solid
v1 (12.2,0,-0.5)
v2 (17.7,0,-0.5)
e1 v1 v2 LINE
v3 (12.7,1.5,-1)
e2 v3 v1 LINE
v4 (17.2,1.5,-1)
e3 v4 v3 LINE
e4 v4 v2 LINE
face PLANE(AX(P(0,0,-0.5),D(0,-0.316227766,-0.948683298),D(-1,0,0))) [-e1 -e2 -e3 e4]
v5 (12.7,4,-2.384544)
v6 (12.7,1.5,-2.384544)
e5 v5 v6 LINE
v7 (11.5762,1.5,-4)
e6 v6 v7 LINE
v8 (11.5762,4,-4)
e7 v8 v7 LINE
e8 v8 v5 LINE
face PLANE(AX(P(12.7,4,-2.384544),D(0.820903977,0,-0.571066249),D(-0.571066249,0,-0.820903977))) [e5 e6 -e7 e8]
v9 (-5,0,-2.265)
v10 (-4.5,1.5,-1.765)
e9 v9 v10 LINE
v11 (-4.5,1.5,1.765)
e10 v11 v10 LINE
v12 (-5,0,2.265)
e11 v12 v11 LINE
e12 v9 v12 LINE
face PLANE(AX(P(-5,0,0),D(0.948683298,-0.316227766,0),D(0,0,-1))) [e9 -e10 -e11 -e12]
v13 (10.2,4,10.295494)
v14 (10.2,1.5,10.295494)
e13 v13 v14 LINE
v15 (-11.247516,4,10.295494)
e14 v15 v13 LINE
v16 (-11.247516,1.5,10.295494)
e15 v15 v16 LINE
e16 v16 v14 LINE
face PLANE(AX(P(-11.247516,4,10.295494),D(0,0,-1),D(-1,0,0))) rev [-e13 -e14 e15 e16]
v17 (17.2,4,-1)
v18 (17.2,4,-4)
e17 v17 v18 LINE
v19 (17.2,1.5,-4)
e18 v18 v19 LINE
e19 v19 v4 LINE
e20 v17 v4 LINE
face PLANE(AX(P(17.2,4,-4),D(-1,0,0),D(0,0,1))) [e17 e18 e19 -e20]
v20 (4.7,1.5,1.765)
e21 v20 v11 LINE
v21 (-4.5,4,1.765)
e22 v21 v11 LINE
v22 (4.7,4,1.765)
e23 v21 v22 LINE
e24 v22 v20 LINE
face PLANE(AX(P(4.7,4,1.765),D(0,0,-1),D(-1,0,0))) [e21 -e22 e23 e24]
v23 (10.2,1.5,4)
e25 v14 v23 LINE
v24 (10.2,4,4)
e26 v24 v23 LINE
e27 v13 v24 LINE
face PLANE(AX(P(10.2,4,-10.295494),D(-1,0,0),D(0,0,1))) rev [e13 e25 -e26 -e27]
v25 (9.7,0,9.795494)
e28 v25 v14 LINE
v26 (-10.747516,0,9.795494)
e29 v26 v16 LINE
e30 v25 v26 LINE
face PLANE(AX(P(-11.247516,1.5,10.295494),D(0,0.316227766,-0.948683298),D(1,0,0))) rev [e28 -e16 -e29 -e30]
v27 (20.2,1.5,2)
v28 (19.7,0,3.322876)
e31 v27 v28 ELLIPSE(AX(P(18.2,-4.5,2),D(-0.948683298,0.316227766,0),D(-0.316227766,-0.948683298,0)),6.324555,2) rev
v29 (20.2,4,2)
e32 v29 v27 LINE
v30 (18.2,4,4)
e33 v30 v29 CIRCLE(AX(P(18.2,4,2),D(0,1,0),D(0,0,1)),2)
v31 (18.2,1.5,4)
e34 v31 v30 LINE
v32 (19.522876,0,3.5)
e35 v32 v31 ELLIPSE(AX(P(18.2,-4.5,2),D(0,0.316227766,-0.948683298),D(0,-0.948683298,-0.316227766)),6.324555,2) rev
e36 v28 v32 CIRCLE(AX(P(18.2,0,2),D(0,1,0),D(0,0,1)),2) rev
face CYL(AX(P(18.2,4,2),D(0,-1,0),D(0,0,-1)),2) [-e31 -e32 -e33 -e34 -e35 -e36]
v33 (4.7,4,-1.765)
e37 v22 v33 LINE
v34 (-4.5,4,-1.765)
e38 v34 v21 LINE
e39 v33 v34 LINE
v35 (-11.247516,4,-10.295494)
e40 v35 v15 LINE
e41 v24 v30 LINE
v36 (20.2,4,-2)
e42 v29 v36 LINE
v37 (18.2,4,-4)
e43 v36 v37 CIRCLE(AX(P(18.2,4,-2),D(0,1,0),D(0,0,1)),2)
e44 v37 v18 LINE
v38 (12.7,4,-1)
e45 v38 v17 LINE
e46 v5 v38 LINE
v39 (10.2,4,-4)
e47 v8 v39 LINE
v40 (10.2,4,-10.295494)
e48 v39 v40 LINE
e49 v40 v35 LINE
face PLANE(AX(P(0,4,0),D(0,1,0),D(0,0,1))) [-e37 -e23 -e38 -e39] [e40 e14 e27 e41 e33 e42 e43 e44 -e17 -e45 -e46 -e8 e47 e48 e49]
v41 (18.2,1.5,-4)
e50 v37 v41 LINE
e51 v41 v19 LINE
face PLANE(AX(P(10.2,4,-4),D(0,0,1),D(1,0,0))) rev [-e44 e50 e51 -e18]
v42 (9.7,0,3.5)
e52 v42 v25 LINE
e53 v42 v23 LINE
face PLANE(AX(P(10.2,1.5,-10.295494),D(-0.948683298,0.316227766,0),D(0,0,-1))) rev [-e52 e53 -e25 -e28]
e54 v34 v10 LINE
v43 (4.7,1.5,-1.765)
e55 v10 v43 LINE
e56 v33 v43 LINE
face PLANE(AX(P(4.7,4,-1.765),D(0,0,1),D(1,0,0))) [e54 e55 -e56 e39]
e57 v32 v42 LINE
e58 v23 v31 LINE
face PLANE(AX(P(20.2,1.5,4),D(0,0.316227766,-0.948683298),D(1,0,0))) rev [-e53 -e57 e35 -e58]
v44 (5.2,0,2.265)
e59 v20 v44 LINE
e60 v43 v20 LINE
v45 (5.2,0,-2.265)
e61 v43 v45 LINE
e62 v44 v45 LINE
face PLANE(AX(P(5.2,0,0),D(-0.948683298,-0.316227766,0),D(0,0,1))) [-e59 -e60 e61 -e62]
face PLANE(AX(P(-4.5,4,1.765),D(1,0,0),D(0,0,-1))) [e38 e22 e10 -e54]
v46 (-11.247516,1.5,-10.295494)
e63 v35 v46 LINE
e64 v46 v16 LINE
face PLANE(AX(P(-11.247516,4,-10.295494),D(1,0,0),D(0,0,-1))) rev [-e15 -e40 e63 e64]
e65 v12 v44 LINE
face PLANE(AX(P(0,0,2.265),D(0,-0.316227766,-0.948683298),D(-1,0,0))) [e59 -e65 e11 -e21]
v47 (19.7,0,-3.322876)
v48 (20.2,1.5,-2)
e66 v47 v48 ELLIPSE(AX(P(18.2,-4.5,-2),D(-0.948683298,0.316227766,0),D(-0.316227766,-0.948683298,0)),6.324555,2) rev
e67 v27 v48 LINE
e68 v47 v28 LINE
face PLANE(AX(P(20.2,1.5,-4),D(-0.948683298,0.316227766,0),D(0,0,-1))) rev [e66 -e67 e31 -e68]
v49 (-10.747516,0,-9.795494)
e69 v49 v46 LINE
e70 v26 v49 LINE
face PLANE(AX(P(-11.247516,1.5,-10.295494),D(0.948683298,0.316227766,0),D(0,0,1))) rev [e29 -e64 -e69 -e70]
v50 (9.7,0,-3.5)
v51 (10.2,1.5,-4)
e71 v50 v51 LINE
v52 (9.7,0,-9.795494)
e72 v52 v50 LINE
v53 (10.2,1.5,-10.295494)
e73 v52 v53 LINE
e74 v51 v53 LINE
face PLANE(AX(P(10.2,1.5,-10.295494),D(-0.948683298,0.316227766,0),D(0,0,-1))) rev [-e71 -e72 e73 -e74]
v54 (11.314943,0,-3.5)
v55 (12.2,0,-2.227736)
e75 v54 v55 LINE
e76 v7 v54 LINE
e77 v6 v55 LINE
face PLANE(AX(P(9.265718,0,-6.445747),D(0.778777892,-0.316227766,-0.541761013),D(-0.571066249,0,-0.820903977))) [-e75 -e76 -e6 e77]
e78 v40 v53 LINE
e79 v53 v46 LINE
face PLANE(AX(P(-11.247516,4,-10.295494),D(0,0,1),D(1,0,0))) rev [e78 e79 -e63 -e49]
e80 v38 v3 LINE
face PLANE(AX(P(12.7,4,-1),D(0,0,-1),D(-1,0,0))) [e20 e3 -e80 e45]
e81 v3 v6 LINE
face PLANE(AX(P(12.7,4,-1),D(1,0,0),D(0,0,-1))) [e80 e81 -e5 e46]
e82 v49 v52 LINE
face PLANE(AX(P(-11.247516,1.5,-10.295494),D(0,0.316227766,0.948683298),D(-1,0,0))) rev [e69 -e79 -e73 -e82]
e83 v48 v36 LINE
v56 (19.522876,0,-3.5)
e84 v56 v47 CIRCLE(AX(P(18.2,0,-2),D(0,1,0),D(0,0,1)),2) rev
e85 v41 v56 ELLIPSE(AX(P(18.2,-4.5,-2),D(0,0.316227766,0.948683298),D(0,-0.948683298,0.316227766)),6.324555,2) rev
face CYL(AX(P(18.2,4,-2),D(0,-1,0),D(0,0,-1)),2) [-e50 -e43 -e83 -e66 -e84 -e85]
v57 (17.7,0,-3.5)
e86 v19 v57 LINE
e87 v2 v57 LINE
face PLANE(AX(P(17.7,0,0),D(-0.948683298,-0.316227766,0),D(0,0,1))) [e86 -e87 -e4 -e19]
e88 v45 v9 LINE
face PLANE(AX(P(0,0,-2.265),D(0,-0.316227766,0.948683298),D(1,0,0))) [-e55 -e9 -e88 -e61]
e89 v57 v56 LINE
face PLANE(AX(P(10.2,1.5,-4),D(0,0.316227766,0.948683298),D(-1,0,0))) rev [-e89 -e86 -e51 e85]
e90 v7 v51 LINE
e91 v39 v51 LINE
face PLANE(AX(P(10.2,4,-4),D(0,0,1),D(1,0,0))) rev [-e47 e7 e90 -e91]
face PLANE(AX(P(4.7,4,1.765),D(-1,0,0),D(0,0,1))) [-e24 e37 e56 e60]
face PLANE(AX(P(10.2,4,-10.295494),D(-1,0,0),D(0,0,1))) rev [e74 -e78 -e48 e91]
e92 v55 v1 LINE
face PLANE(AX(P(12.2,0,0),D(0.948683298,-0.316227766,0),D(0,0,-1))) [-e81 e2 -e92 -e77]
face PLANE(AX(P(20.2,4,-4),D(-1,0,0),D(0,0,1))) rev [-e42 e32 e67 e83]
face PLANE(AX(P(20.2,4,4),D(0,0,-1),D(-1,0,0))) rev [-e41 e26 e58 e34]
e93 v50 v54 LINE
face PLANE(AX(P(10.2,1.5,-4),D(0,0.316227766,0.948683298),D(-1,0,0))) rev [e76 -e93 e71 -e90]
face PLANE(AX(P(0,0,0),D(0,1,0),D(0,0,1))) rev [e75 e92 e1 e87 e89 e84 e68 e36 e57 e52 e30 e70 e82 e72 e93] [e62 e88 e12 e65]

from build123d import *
from OCP.BRepFilletAPI import BRepFilletAPI_MakeChamfer

# Parameters (mm, degrees)
SKETCH1_W           = 21.447515714
SKETCH1_H           = 20.590988136
SKETCH1_W_2         = 9.2
SKETCH1_H_2         = 3.53
BOSS_EXTRUDE1_DEPTH = 4
SKETCH2_W           = 10
SKETCH2_H           = 8
BOSS_EXTRUDE3_DEPTH = 4
CUT_EXTRUDE1_DEPTH  = 24.022536743
CHAMFER1_SIZE       = 1.5
CHAMFER1_SIZE2      = 0.5
FILLET1_R           = 2


with BuildPart() as part:
    # Sketch1 → Boss-Extrude1 (new body)
    with BuildSketch(Plane(origin=(0, 0, 0), x_dir=(1, 0, 0), z_dir=(0, 1, 0))):
        with Locations((-0.523757857, 0)):
            Rectangle(SKETCH1_W, SKETCH1_H)
        with Locations((0.1, 0)):
            Rectangle(SKETCH1_W_2, SKETCH1_H_2, mode=Mode.SUBTRACT)
    extrude(amount=BOSS_EXTRUDE1_DEPTH)

    # Sketch2 → Boss-Extrude3 (add)
    with BuildSketch(Plane(origin=(0, 0, 0), x_dir=(1, 0, 0), z_dir=(0, 1, 0))):
        with Locations((15.2, 0)):
            Rectangle(SKETCH2_W, SKETCH2_H)
    extrude(amount=BOSS_EXTRUDE3_DEPTH)

    # Sketch3 → Cut-Extrude1 (cut, through all)
    with BuildSketch(Plane(origin=(0, 0, 0), x_dir=(1, 0, 0), z_dir=(0, 1, 0))):
        Polygon((12.7, 1), (12.7, 2.38454447), (11.576199706, 4), (12.7, 4), (17.2, 4), (17.2, 1), align=None)
    extrude(amount=CUT_EXTRUDE1_DEPTH, mode=Mode.SUBTRACT)

    # Chamfer1: one chamfer whose edges measure the first distance from different faces: ONE call of the kernel's chamfer builder (chamfer() names one face for all edges)
    chamfer1_edges_1 = [part.edges().sort_by_distance(p)[0] for p in [
        (4.7, 0, 0),
    ]]
    chamfer1_side_1 = [part.faces().sort_by_distance(p)[0] for p in [
        (4.7, 2, 0),
    ]]
    chamfer1_edges_2 = [part.edges().sort_by_distance(p)[0] for p in [
        (0.1, 0, -1.765),
    ]]
    chamfer1_side_2 = [part.faces().sort_by_distance(p)[0] for p in [
        (0.1, 2, -1.765),
    ]]
    chamfer1_edges_3 = [part.edges().sort_by_distance(p)[0] for p in [
        (-4.5, 0, 0),
    ]]
    chamfer1_side_3 = [part.faces().sort_by_distance(p)[0] for p in [
        (-4.5, 2, 0),
    ]]
    chamfer1_edges_4 = [part.edges().sort_by_distance(p)[0] for p in [
        (0.1, 0, 1.765),
    ]]
    chamfer1_side_4 = [part.faces().sort_by_distance(p)[0] for p in [
        (0.1, 2, 1.765),
    ]]
    chamfer1_edges_5 = [part.edges().sort_by_distance(p)[0] for p in [
        (10.2, 0, -7.147747034),
    ]]
    chamfer1_side_5 = [part.faces().sort_by_distance(p)[0] for p in [
        (10.2, 2, -7.147747034),
    ]]
    chamfer1_edges_6 = [part.edges().sort_by_distance(p)[0] for p in [
        (15.2, 0, 4),
    ]]
    chamfer1_side_6 = [part.faces().sort_by_distance(p)[0] for p in [
        (15.2, 2, 4),
    ]]
    chamfer1_edges_7 = [part.edges().sort_by_distance(p)[0] for p in [
        (20.2, 0, 0),
    ]]
    chamfer1_side_7 = [part.faces().sort_by_distance(p)[0] for p in [
        (20.2, 2, 0),
    ]]
    chamfer1_edges_8 = [part.edges().sort_by_distance(p)[0] for p in [
        (18.7, 0, -4),
    ]]
    chamfer1_side_8 = [part.faces().sort_by_distance(p)[0] for p in [
        (18.7, 2, -4),
    ]]
    chamfer1_edges_9 = [part.edges().sort_by_distance(p)[0] for p in [
        (10.888099853, 0, -4),
    ]]
    chamfer1_side_9 = [part.faces().sort_by_distance(p)[0] for p in [
        (10.888099853, 2, -4),
    ]]
    chamfer1_edges_10 = [part.edges().sort_by_distance(p)[0] for p in [
        (12.138099853, 0, -3.192272235),
    ]]
    chamfer1_side_10 = [part.faces().sort_by_distance(p)[0] for p in [
        (12.138099853, 2, -3.192272235),
    ]]
    chamfer1_edges_11 = [part.edges().sort_by_distance(p)[0] for p in [
        (12.7, 0, -1.692272235),
    ]]
    chamfer1_side_11 = [part.faces().sort_by_distance(p)[0] for p in [
        (12.7, 2, -1.692272235),
    ]]
    chamfer1_edges_12 = [part.edges().sort_by_distance(p)[0] for p in [
        (14.95, 0, -1),
    ]]
    chamfer1_side_12 = [part.faces().sort_by_distance(p)[0] for p in [
        (14.95, 2, -1),
    ]]
    chamfer1_edges_13 = [part.edges().sort_by_distance(p)[0] for p in [
        (17.2, 0, -2.5),
    ]]
    chamfer1_side_13 = [part.faces().sort_by_distance(p)[0] for p in [
        (17.2, 2, -2.5),
    ]]
    chamfer1_edges_14 = [part.edges().sort_by_distance(p)[0] for p in [
        (-0.523757857, 0, -10.295494068),
    ]]
    chamfer1_side_14 = [part.faces().sort_by_distance(p)[0] for p in [
        (-0.523757857, 2, -10.295494068),
    ]]
    chamfer1_edges_15 = [part.edges().sort_by_distance(p)[0] for p in [
        (10.2, 0, 7.147747034),
    ]]
    chamfer1_side_15 = [part.faces().sort_by_distance(p)[0] for p in [
        (10.2, 2, 7.147747034),
    ]]
    chamfer1_edges_16 = [part.edges().sort_by_distance(p)[0] for p in [
        (-0.523757857, 0, 10.295494068),
    ]]
    chamfer1_side_16 = [part.faces().sort_by_distance(p)[0] for p in [
        (-0.523757857, 2, 10.295494068),
    ]]
    chamfer1_edges_17 = [part.edges().sort_by_distance(p)[0] for p in [
        (-11.247515714, 0, 0),
    ]]
    chamfer1_side_17 = [part.faces().sort_by_distance(p)[0] for p in [
        (-11.247515714, 2, 0),
    ]]
    chamfer1 = BRepFilletAPI_MakeChamfer(part.part.solid().wrapped)
    for e in chamfer1_edges_1:
        chamfer1.Add(CHAMFER1_SIZE, CHAMFER1_SIZE2, e.wrapped, chamfer1_side_1[0].wrapped)  # the first distance lies on this face
    for e in chamfer1_edges_2:
        chamfer1.Add(CHAMFER1_SIZE, CHAMFER1_SIZE2, e.wrapped, chamfer1_side_2[0].wrapped)  # the first distance lies on this face
    for e in chamfer1_edges_3:
        chamfer1.Add(CHAMFER1_SIZE, CHAMFER1_SIZE2, e.wrapped, chamfer1_side_3[0].wrapped)  # the first distance lies on this face
    for e in chamfer1_edges_4:
        chamfer1.Add(CHAMFER1_SIZE, CHAMFER1_SIZE2, e.wrapped, chamfer1_side_4[0].wrapped)  # the first distance lies on this face
    for e in chamfer1_edges_5:
        chamfer1.Add(CHAMFER1_SIZE, CHAMFER1_SIZE2, e.wrapped, chamfer1_side_5[0].wrapped)  # the first distance lies on this face
    for e in chamfer1_edges_6:
        chamfer1.Add(CHAMFER1_SIZE, CHAMFER1_SIZE2, e.wrapped, chamfer1_side_6[0].wrapped)  # the first distance lies on this face
    for e in chamfer1_edges_7:
        chamfer1.Add(CHAMFER1_SIZE, CHAMFER1_SIZE2, e.wrapped, chamfer1_side_7[0].wrapped)  # the first distance lies on this face
    for e in chamfer1_edges_8:
        chamfer1.Add(CHAMFER1_SIZE, CHAMFER1_SIZE2, e.wrapped, chamfer1_side_8[0].wrapped)  # the first distance lies on this face
    for e in chamfer1_edges_9:
        chamfer1.Add(CHAMFER1_SIZE, CHAMFER1_SIZE2, e.wrapped, chamfer1_side_9[0].wrapped)  # the first distance lies on this face
    for e in chamfer1_edges_10:
        chamfer1.Add(CHAMFER1_SIZE, CHAMFER1_SIZE2, e.wrapped, chamfer1_side_10[0].wrapped)  # the first distance lies on this face
    for e in chamfer1_edges_11:
        chamfer1.Add(CHAMFER1_SIZE, CHAMFER1_SIZE2, e.wrapped, chamfer1_side_11[0].wrapped)  # the first distance lies on this face
    for e in chamfer1_edges_12:
        chamfer1.Add(CHAMFER1_SIZE, CHAMFER1_SIZE2, e.wrapped, chamfer1_side_12[0].wrapped)  # the first distance lies on this face
    for e in chamfer1_edges_13:
        chamfer1.Add(CHAMFER1_SIZE, CHAMFER1_SIZE2, e.wrapped, chamfer1_side_13[0].wrapped)  # the first distance lies on this face
    for e in chamfer1_edges_14:
        chamfer1.Add(CHAMFER1_SIZE, CHAMFER1_SIZE2, e.wrapped, chamfer1_side_14[0].wrapped)  # the first distance lies on this face
    for e in chamfer1_edges_15:
        chamfer1.Add(CHAMFER1_SIZE, CHAMFER1_SIZE2, e.wrapped, chamfer1_side_15[0].wrapped)  # the first distance lies on this face
    for e in chamfer1_edges_16:
        chamfer1.Add(CHAMFER1_SIZE, CHAMFER1_SIZE2, e.wrapped, chamfer1_side_16[0].wrapped)  # the first distance lies on this face
    for e in chamfer1_edges_17:
        chamfer1.Add(CHAMFER1_SIZE, CHAMFER1_SIZE2, e.wrapped, chamfer1_side_17[0].wrapped)  # the first distance lies on this face
    add(Compound.cast(chamfer1.Shape()), mode=Mode.REPLACE)

    # Fillet1
    # the kernel refuses this fillet: 2 mm, written as the material it takes off along each edge
    with BuildSketch(Plane(origin=(20.2, -3.5, 4), x_dir=(-1, 0, 0), z_dir=(0, 1, 0)), Plane(origin=(20.2, -3.5, -4), x_dir=(0, 0, 1), z_dir=(0, 1, 0))) as fillet1_piece_1:
        with BuildLine():
            CenterArc((FILLET1_R, -FILLET1_R), FILLET1_R, 90, 90)
            Line((0, -FILLET1_R), (0, 0))
            Line((0, 0), (FILLET1_R, 0))
        make_face()
    extrude(amount=12.5, mode=Mode.SUBTRACT)


solid = part.part
